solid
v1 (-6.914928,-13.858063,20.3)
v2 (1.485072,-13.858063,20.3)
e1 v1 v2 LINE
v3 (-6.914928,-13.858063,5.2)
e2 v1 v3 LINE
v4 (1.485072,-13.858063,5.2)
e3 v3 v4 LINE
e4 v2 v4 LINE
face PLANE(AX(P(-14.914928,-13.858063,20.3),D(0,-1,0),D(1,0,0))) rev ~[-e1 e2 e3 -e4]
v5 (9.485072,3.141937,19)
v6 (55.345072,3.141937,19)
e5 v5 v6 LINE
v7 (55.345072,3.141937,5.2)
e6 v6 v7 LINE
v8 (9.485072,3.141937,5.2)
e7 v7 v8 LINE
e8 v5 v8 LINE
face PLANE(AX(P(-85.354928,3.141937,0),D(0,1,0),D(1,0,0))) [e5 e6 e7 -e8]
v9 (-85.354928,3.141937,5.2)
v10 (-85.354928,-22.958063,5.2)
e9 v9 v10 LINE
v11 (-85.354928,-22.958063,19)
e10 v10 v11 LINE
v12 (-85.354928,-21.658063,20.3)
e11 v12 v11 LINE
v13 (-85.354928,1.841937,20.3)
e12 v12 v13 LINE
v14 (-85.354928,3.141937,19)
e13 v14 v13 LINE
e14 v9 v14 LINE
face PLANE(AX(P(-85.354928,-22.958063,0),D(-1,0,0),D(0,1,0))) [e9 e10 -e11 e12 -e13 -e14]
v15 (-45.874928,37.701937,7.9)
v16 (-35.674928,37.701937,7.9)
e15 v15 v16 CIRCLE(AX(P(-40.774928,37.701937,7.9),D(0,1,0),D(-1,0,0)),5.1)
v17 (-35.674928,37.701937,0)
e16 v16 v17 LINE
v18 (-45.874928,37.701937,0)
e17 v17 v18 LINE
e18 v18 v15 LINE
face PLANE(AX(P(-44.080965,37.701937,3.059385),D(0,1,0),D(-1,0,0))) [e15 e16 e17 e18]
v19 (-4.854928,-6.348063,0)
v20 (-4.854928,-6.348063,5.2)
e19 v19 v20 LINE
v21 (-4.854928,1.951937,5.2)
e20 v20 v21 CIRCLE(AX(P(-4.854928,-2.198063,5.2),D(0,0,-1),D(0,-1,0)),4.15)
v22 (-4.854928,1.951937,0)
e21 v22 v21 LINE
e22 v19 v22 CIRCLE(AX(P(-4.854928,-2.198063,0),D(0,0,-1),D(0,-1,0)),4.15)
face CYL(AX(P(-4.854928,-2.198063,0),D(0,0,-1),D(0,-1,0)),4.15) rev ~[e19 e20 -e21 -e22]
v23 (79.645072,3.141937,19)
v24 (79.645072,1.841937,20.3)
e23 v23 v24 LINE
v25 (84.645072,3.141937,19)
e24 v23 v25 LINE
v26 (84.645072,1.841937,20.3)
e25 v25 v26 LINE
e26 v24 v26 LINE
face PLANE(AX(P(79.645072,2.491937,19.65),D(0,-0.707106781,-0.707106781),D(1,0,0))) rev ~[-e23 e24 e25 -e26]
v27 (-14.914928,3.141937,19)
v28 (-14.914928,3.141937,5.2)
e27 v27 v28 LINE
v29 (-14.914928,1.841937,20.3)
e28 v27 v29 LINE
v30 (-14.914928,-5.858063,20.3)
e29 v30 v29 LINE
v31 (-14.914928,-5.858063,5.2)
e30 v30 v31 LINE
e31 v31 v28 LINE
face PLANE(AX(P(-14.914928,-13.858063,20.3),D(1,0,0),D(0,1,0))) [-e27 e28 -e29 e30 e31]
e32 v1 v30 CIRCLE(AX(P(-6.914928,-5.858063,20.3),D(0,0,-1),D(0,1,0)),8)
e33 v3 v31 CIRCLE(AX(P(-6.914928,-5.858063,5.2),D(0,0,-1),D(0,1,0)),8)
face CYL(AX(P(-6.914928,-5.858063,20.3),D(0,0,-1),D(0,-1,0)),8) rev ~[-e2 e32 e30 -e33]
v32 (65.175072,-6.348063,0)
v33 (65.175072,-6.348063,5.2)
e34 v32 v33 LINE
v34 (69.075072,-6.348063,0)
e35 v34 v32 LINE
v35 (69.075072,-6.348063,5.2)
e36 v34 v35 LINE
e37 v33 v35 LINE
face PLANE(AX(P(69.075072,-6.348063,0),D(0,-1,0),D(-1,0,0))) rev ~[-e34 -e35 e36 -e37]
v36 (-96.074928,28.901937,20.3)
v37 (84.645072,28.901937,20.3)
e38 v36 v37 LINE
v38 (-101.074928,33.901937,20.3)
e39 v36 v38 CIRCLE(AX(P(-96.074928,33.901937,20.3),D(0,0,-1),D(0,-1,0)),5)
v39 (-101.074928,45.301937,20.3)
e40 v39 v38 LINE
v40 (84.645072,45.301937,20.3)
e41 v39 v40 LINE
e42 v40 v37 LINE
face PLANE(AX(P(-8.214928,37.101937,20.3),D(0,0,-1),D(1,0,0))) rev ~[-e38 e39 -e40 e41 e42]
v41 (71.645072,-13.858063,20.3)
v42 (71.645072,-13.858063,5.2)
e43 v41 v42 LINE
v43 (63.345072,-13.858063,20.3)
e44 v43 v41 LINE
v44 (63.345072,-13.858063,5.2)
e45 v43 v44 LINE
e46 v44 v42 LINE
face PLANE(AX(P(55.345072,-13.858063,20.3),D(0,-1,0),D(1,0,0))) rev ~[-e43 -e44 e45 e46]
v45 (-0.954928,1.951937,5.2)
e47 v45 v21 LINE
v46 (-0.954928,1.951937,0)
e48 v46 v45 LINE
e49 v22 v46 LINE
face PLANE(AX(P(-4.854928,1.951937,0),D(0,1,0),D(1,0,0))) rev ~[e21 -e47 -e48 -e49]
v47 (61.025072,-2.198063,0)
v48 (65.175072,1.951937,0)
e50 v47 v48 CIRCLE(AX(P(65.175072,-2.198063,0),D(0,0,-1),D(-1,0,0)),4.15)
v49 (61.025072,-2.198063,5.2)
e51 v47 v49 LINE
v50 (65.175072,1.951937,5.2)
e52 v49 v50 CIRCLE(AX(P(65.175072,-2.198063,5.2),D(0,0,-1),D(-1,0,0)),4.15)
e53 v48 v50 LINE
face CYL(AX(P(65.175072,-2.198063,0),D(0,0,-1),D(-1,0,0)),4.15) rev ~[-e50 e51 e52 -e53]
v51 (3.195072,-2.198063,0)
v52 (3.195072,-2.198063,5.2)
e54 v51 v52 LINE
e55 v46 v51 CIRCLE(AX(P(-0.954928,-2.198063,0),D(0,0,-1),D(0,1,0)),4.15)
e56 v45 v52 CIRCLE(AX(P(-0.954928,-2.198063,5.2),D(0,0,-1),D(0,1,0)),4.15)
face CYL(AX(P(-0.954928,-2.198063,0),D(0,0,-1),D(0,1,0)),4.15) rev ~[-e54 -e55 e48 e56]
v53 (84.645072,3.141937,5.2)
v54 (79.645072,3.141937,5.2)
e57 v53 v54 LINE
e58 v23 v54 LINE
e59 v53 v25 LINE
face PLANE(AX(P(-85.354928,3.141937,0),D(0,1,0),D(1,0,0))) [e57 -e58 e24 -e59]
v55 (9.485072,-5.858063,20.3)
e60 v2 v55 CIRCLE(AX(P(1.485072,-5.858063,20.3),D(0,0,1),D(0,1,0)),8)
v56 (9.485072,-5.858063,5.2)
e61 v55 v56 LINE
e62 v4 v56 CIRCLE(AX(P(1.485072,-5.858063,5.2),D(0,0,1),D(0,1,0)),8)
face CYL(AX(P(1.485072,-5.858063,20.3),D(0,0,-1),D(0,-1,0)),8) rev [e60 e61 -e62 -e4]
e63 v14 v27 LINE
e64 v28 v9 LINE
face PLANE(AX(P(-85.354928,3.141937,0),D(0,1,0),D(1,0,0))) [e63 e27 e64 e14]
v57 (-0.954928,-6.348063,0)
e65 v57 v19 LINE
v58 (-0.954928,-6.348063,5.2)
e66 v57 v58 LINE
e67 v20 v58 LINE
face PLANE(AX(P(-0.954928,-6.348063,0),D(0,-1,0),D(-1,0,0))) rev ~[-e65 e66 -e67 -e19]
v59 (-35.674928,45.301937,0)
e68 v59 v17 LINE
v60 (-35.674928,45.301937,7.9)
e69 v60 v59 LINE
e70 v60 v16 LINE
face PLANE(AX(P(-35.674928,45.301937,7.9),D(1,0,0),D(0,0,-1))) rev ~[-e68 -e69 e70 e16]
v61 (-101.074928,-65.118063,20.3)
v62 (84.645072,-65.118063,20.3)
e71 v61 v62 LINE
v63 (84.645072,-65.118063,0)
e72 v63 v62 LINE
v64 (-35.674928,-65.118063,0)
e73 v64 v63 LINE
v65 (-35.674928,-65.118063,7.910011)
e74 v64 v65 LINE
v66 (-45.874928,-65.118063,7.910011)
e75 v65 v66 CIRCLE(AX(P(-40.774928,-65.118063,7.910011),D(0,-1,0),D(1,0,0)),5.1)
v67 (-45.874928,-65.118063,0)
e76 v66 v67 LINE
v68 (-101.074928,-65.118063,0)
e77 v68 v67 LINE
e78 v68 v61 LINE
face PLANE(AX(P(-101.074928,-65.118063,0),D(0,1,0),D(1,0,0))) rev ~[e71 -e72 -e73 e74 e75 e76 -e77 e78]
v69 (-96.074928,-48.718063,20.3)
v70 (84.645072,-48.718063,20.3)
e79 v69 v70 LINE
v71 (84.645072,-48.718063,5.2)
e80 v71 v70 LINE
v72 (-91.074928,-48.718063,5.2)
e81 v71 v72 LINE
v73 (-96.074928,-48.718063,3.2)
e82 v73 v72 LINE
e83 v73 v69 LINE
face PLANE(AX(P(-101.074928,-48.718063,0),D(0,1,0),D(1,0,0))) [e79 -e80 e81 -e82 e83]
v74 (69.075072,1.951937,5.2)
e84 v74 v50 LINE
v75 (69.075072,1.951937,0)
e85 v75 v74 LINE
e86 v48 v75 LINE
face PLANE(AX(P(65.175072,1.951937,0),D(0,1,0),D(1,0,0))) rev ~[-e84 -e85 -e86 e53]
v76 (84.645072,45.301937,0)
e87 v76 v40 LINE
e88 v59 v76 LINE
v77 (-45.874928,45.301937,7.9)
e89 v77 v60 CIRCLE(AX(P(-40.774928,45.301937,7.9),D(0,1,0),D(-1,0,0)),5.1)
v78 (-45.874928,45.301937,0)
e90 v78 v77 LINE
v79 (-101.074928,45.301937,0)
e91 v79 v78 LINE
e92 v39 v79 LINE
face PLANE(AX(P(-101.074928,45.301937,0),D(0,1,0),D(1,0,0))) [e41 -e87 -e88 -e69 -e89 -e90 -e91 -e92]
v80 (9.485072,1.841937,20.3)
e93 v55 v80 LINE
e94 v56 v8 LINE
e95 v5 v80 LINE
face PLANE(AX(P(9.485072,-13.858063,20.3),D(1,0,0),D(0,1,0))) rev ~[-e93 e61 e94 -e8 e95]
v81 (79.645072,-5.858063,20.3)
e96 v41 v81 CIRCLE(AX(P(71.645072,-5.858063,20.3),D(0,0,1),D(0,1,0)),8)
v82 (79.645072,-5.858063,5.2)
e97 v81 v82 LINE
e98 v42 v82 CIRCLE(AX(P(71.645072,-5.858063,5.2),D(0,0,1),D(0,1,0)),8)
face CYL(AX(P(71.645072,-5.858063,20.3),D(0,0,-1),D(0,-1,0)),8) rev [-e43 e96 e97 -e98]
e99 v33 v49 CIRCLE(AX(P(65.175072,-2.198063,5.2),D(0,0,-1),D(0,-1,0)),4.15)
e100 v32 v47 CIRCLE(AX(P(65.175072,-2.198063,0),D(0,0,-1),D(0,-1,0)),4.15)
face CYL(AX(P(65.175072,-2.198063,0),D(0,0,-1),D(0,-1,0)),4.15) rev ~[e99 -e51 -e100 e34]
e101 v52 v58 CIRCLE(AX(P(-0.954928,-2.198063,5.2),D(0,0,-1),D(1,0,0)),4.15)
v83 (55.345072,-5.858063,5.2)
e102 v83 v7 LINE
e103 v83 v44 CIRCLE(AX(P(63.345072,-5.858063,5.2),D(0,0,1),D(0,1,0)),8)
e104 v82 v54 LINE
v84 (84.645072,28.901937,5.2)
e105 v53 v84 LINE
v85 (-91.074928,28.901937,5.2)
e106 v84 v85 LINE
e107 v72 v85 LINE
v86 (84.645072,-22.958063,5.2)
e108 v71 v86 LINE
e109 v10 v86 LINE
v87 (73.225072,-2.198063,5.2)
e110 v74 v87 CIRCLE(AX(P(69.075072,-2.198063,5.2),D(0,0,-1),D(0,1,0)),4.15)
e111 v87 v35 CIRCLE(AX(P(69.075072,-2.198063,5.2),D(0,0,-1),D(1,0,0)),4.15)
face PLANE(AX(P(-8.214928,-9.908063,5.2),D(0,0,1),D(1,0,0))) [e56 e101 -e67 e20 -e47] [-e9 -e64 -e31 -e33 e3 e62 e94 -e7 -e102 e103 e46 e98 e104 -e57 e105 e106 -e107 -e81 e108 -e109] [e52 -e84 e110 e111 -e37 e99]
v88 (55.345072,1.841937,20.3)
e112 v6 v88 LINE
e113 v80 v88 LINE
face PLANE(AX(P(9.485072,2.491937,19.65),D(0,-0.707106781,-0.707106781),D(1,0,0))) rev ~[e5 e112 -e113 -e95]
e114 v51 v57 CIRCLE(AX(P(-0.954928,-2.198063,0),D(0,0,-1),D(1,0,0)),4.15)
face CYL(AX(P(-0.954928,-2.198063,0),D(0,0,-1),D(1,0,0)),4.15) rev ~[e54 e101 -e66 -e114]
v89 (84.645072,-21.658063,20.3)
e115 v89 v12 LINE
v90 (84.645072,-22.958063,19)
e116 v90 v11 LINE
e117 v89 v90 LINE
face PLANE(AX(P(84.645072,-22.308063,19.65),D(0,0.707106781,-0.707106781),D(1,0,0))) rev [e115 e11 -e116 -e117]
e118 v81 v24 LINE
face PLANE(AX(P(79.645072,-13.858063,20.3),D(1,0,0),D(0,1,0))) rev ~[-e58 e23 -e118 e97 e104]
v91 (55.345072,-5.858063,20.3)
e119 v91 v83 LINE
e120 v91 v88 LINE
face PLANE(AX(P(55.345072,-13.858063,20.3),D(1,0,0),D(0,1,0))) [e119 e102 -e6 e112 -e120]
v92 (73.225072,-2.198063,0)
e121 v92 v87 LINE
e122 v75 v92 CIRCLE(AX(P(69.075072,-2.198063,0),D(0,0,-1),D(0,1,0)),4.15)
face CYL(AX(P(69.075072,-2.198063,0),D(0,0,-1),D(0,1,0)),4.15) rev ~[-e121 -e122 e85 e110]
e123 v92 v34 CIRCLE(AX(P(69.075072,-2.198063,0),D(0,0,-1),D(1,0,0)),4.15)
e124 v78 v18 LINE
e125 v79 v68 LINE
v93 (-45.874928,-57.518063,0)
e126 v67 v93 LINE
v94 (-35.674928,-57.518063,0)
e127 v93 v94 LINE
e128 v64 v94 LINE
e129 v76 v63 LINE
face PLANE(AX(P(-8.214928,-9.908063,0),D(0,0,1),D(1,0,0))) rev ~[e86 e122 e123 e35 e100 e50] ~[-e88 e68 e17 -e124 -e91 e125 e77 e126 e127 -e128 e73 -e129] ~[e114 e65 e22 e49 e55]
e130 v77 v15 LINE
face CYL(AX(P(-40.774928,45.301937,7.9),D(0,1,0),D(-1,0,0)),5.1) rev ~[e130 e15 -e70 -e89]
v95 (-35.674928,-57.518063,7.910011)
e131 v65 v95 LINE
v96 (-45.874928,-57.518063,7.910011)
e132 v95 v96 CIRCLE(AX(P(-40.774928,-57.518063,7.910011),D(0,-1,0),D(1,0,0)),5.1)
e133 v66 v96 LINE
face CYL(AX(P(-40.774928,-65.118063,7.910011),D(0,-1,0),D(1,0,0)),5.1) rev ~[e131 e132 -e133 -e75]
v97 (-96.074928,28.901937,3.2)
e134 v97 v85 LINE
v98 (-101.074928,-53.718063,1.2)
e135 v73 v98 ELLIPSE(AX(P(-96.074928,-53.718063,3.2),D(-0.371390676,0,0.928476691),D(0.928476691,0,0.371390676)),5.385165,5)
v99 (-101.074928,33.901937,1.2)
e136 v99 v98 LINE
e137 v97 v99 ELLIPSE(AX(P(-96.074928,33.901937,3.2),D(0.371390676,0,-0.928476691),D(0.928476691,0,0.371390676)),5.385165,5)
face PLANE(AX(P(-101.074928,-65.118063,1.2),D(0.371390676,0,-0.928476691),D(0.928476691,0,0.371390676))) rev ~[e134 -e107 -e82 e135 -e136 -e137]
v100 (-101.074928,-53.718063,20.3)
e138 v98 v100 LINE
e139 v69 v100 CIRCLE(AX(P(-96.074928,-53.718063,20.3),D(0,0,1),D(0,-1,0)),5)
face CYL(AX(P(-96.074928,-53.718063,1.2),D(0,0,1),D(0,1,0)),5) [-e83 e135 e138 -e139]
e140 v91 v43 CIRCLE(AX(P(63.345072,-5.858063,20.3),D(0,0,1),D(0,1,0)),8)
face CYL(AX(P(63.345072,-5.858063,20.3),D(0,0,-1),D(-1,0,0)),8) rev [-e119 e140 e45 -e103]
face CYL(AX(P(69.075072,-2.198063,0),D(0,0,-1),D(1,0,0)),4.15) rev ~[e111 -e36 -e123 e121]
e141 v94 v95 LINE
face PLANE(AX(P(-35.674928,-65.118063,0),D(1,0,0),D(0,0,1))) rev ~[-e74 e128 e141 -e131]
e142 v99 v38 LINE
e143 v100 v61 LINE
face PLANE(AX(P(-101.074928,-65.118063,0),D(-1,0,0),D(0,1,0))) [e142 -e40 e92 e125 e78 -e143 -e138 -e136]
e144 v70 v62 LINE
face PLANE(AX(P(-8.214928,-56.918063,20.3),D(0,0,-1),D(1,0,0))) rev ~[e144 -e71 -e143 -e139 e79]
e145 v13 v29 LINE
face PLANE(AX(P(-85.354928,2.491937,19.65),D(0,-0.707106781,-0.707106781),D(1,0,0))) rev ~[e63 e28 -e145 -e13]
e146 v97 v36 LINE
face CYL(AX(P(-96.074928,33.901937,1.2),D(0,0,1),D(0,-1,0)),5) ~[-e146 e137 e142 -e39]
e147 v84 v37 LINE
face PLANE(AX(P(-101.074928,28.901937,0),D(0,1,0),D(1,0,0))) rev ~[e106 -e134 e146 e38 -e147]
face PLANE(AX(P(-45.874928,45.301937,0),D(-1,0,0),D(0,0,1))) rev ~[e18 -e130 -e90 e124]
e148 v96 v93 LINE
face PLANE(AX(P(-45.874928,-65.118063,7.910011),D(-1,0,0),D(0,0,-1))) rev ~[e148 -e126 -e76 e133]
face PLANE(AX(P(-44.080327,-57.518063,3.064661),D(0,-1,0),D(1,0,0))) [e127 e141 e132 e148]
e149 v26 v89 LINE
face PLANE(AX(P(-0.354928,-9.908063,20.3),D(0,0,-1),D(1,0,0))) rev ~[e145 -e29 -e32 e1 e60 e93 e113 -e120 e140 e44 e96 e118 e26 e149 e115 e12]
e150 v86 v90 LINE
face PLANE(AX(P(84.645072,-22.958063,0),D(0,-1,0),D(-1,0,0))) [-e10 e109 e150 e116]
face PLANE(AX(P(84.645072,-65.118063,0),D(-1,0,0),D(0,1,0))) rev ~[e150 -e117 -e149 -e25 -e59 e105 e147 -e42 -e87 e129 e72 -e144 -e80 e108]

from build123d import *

# Parameters (mm, degrees)
F0_W      = 185.72
F0_H      = 110.42
F1_DEPTH  = 5.2
F3_DEPTH  = 110.42
F4_W      = 185.72
F4_H      = 16.4
F5_DEPTH  = 20.3
F6_W      = 24.4
F6_H      = 17
F6_W_2    = 24.3
F7_DEPTH  = 15.1
F8_R      = 8
F9_R      = 8
F10_R     = 5
F11_SIZE  = 1.3
F14_DEPTH = 7.6
F16_DEPTH = 7.6
F17_DEPTH = 20.301


with BuildPart() as f1:
    # F0 (on Top) → F1 (new body)
    with BuildSketch(Plane.XY):
        with Locations((-8.2149282098, -9.908063139)):
            Rectangle(F0_W, F0_H)
    extrude(amount=F1_DEPTH)

    # F2 (on face) → F3 (cut, through all)
    with BuildSketch(Plane.XZ.offset(65.118063139)):
        Polygon((-91.0749282098, 5.2), (-101.0749282098, 5.2), (-101.0749282098, 1.2), align=None)
    extrude(amount=-F3_DEPTH, mode=Mode.SUBTRACT)

    # F4 (on face) → F5 (join)
    with BuildSketch(Plane(origin=(0, 0, 0), x_dir=(1, 0, 0), z_dir=(0, 0, -1))):
        with Locations((-8.2149282098, 56.918063139)):
            Rectangle(F4_W, F4_H)
        with Locations((-8.2149282098, -37.101936861)):
            Rectangle(F4_W, F4_H)
        Polygon((84.6450717902, 9.908063139), (84.6450717902, 22.958063139), (-85.3549282098, 22.958063139), (-85.3549282098, 9.908063139), (-85.3549282098, -3.141936861), (84.6450717902, -3.141936861), align=None)
    extrude(amount=-F5_DEPTH)

    # F6 (on face) → F7 (cut)
    with BuildSketch(Plane.XY.offset(20.3)):
        with Locations((-2.7149282098, -5.358063139)):
            Rectangle(F6_W, F6_H)
        with Locations((67.4950717902, -5.358063139)):
            Rectangle(F6_W_2, F6_H)
    extrude(amount=-F7_DEPTH, mode=Mode.SUBTRACT)

    # F8
    f8_edges = [f1.edges().sort_by_distance(p)[0] for p in [
        (-14.914928, -13.858063, 12.75),
    ]]
    fillet(f8_edges, radius=F8_R)

    # F9
    f9_edges = [f1.edges().sort_by_distance(p)[0] for p in [
        (9.485072, -13.858063, 12.75),
        (79.645072, -13.858063, 12.75),
        (55.345072, -13.858063, 12.75),
    ]]
    fillet(f9_edges, radius=F9_R)

    # F10
    f10_edges = [f1.edges().sort_by_distance(p)[0] for p in [
        (-101.074928, 28.901937, 10.75),
        (-101.074928, -48.718063, 10.75),
    ]]
    fillet(f10_edges, radius=F10_R)

    # F11
    f11_edges = [f1.edges().sort_by_distance(p)[0] for p in [
        (-50.134928, 3.141937, 20.3),
        (32.415072, 3.141937, 20.3),
        (82.145072, 3.141937, 20.3),
        (-0.354928, -22.958063, 20.3),
    ]]
    chamfer(f11_edges, length=F11_SIZE)

    # F13 (on face) → F14 (cut)
    with BuildSketch(Plane.XZ.offset(65.118063139)):
        with BuildLine():
            Line((-45.8749282098, 7.9100113362), (-45.8749282098, 0))
            Line((-45.8749282098, 0), (-40.7749282098, 0))
            Line((-40.7749282098, 0), (-40.7749282098, 2.8100113362))
            ThreePointArc((-40.7749282098, 2.8100113362), (-44.3811727938, 4.3037667522), (-45.8749282098, 7.9100113362))
        make_face()
        with BuildLine():
            Line((-40.7749282098, 2.8100113362), (-40.7749282098, 0))
            Line((-40.7749282098, 0), (-35.6749282098, 0))
            Line((-35.6749282098, 0), (-35.6749282098, 7.9100113362))
            ThreePointArc((-35.6749282098, 7.9100113362), (-37.1686836257, 4.3037667522), (-40.7749282098, 2.8100113362))
        make_face()
        with BuildLine():
            Line((-40.7749282098, 7.9100113362), (-45.8749282098, 7.9100113362))
            ThreePointArc((-45.8749282098, 7.9100113362), (-44.3811727938, 4.3037667522), (-40.7749282098, 2.8100113362))
            Line((-40.7749282098, 2.8100113362), (-40.7749282098, 7.9100113362))
        make_face()
        with BuildLine():
            ThreePointArc((-35.6749282098, 7.9100113362), (-40.7749282098, 13.0100113362), (-45.8749282098, 7.9100113362))
            Line((-45.8749282098, 7.9100113362), (-40.7749282098, 7.9100113362))
            Line((-40.7749282098, 7.9100113362), (-35.6749282098, 7.9100113362))
        make_face()
        with BuildLine():
            Line((-40.7749282098, 7.9100113362), (-40.7749282098, 2.8100113362))
            ThreePointArc((-40.7749282098, 2.8100113362), (-37.1686836257, 4.3037667522), (-35.6749282098, 7.9100113362))
            Line((-35.6749282098, 7.9100113362), (-40.7749282098, 7.9100113362))
        make_face()
    extrude(amount=-F14_DEPTH, mode=Mode.SUBTRACT)

    # F15 (on face) → F16 (cut)
    with BuildSketch(Plane(origin=(0, 45.301936861, 0), x_dir=(-1, 0, 0), z_dir=(0, 1, 0))):
        with BuildLine():
            Line((40.7749282098, 0), (45.8749282098, 0))
            Line((45.8749282098, 0), (45.8749282098, 7.9))
            ThreePointArc((45.8749282098, 7.9), (44.3811727938, 4.2937554159), (40.7749282098, 2.8))
            Line((40.7749282098, 2.8), (40.7749282098, 0))
        make_face()
        with BuildLine():
            Line((35.6749282098, 0), (40.7749282098, 0))
            Line((40.7749282098, 0), (40.7749282098, 2.8))
            ThreePointArc((40.7749282098, 2.8), (37.1686836257, 4.2937554159), (35.6749282098, 7.9))
            Line((35.6749282098, 7.9), (35.6749282098, 0))
        make_face()
        with BuildLine():
            ThreePointArc((40.7749282098, 2.8), (44.3811727938, 4.2937554159), (45.8749282098, 7.9))
            Line((45.8749282098, 7.9), (40.7749282098, 7.9))
            Line((40.7749282098, 7.9), (40.7749282098, 2.8))
        make_face()
        with BuildLine():
            ThreePointArc((35.6749282098, 7.9), (37.1686836257, 4.2937554159), (40.7749282098, 2.8))
            Line((40.7749282098, 2.8), (40.7749282098, 7.9))
            Line((40.7749282098, 7.9), (35.6749282098, 7.9))
        make_face()
        with BuildLine():
            Line((40.7749282098, 7.9), (45.8749282098, 7.9))
            ThreePointArc((45.8749282098, 7.9), (40.7749282098, 13), (35.6749282098, 7.9))
            Line((35.6749282098, 7.9), (40.7749282098, 7.9))
        make_face()
    extrude(amount=-F16_DEPTH, mode=Mode.SUBTRACT)

    # F12 (on face) → F17 (cut, through all)
    with BuildSketch(Plane(origin=(0, 0, 0), x_dir=(1, 0, 0), z_dir=(0, 0, -1))):
        with BuildLine():
            ThreePointArc((-0.9549282098, -1.951936861), (1.9795649321, -0.7364300029), (3.1950717902, 2.198063139))
            Line((3.1950717902, 2.198063139), (-0.7049282098, 2.198063139))
            ThreePointArc((-0.7049282098, 2.198063139), (-1.2971901643, 0.0614770771), (-2.9049282098, -1.4652686778))
            ThreePointArc((-2.9049282098, -1.4652686778), (-1.9598344144, -1.8284320516), (-0.9549282098, -1.951936861))
        make_face()
        with BuildLine():
            Line((-0.7049282098, 2.198063139), (3.1950717902, 2.198063139))
            ThreePointArc((3.1950717902, 2.198063139), (1.9795649321, 5.132556281), (-0.9549282098, 6.348063139))
            ThreePointArc((-0.9549282098, 6.348063139), (-1.9598344144, 6.2245583296), (-2.9049282098, 5.8613949558))
            ThreePointArc((-2.9049282098, 5.8613949558), (-1.2971901643, 4.334649201), (-0.7049282098, 2.198063139))
        make_face()
        with BuildLine():
            ThreePointArc((69.0750717902, -1.951936861), (72.0095649321, -0.7364300029), (73.2250717902, 2.198063139))
            Line((73.2250717902, 2.198063139), (69.3250717902, 2.198063139))
            ThreePointArc((69.3250717902, 2.198063139), (68.7328098357, 0.0614770771), (67.1250717902, -1.4652686778))
            ThreePointArc((67.1250717902, -1.4652686778), (68.0701655856, -1.8284320516), (69.0750717902, -1.951936861))
        make_face()
        with BuildLine():
            Line((69.3250717902, 2.198063139), (73.2250717902, 2.198063139))
            ThreePointArc((73.2250717902, 2.198063139), (72.0095649321, 5.132556281), (69.0750717902, 6.348063139))
            ThreePointArc((69.0750717902, 6.348063139), (68.0701655856, 6.2245583296), (67.1250717902, 5.8613949558))
            ThreePointArc((67.1250717902, 5.8613949558), (68.7328098357, 4.334649201), (69.3250717902, 2.198063139))
        make_face()
        with BuildLine():
            ThreePointArc((67.1250717902, -1.4652686778), (68.7328098357, 0.0614770771), (69.3250717902, 2.198063139))
            Line((69.3250717902, 2.198063139), (69.0750717902, 2.198063139))
            Line((69.0750717902, 2.198063139), (65.1750717902, 2.198063139))
            Line((65.1750717902, 2.198063139), (64.9250717902, 2.198063139))
            ThreePointArc((64.9250717902, 2.198063139), (65.5173337448, 0.0614770771), (67.1250717902, -1.4652686778))
        make_face()
        with BuildLine():
            Line((69.0750717902, 2.198063139), (69.3250717902, 2.198063139))
            ThreePointArc((69.3250717902, 2.198063139), (68.7328098357, 4.334649201), (67.1250717902, 5.8613949558))
            ThreePointArc((67.1250717902, 5.8613949558), (65.5173337448, 4.334649201), (64.9250717902, 2.198063139))
            Line((64.9250717902, 2.198063139), (65.1750717902, 2.198063139))
            Line((65.1750717902, 2.198063139), (69.0750717902, 2.198063139))
        make_face()
        with BuildLine():
            ThreePointArc((67.1250717902, 5.8613949558), (68.0701655856, 6.2245583296), (69.0750717902, 6.348063139))
            Line((69.0750717902, 6.348063139), (65.1750717902, 6.348063139))
            ThreePointArc((65.1750717902, 6.348063139), (66.1799779949, 6.2245583296), (67.1250717902, 5.8613949558))
        make_face()
        with BuildLine():
            Line((65.1750717902, -1.951936861), (69.0750717902, -1.951936861))
            ThreePointArc((69.0750717902, -1.951936861), (68.0701655856, -1.8284320516), (67.1250717902, -1.4652686778))
            ThreePointArc((67.1250717902, -1.4652686778), (66.1799779949, -1.8284320516), (65.1750717902, -1.951936861))
        make_face()
        with BuildLine():
            ThreePointArc((64.9250717902, 2.198063139), (65.5173337448, 4.334649201), (67.1250717902, 5.8613949558))
            ThreePointArc((67.1250717902, 5.8613949558), (66.1799779949, 6.2245583296), (65.1750717902, 6.348063139))
            ThreePointArc((65.1750717902, 6.348063139), (62.2405786483, 5.132556281), (61.0250717902, 2.198063139))
            Line((61.0250717902, 2.198063139), (64.9250717902, 2.198063139))
        make_face()
        with BuildLine():
            ThreePointArc((65.1750717902, -1.951936861), (66.1799779949, -1.8284320516), (67.1250717902, -1.4652686778))
            ThreePointArc((67.1250717902, -1.4652686778), (65.5173337448, 0.0614770771), (64.9250717902, 2.198063139))
            Line((64.9250717902, 2.198063139), (61.0250717902, 2.198063139))
            ThreePointArc((61.0250717902, 2.198063139), (62.2405786483, -0.7364300029), (65.1750717902, -1.951936861))
        make_face()
        with BuildLine():
            ThreePointArc((-2.9049282098, -1.4652686778), (-1.2971901643, 0.0614770771), (-0.7049282098, 2.198063139))
            ThreePointArc((-0.7049282098, 2.198063139), (-1.2971901643, 4.334649201), (-2.9049282098, 5.8613949558))
            ThreePointArc((-2.9049282098, 5.8613949558), (-5.1049282098, 2.198063139), (-2.9049282098, -1.4652686778))
        make_face()
        with BuildLine():
            ThreePointArc((-2.9049282098, 5.8613949558), (-1.9598344144, 6.2245583296), (-0.9549282098, 6.348063139))
            Line((-0.9549282098, 6.348063139), (-4.8549282098, 6.348063139))
            ThreePointArc((-4.8549282098, 6.348063139), (-3.8500220051, 6.2245583296), (-2.9049282098, 5.8613949558))
        make_face()
        with BuildLine():
            Line((-4.8549282098, -1.951936861), (-0.9549282098, -1.951936861))
            ThreePointArc((-0.9549282098, -1.951936861), (-1.9598344144, -1.8284320516), (-2.9049282098, -1.4652686778))
            ThreePointArc((-2.9049282098, -1.4652686778), (-3.8500220051, -1.8284320516), (-4.8549282098, -1.951936861))
        make_face()
        with BuildLine():
            ThreePointArc((-2.9049282098, -1.4652686778), (-5.1049282098, 2.198063139), (-2.9049282098, 5.8613949558))
            ThreePointArc((-2.9049282098, 5.8613949558), (-3.8500220051, 6.2245583296), (-4.8549282098, 6.348063139))
            ThreePointArc((-4.8549282098, 6.348063139), (-9.0049282098, 2.198063139), (-4.8549282098, -1.951936861))
            ThreePointArc((-4.8549282098, -1.951936861), (-3.8500220051, -1.8284320516), (-2.9049282098, -1.4652686778))
        make_face()
    extrude(amount=-F17_DEPTH, mode=Mode.SUBTRACT)


solid = f1.part
